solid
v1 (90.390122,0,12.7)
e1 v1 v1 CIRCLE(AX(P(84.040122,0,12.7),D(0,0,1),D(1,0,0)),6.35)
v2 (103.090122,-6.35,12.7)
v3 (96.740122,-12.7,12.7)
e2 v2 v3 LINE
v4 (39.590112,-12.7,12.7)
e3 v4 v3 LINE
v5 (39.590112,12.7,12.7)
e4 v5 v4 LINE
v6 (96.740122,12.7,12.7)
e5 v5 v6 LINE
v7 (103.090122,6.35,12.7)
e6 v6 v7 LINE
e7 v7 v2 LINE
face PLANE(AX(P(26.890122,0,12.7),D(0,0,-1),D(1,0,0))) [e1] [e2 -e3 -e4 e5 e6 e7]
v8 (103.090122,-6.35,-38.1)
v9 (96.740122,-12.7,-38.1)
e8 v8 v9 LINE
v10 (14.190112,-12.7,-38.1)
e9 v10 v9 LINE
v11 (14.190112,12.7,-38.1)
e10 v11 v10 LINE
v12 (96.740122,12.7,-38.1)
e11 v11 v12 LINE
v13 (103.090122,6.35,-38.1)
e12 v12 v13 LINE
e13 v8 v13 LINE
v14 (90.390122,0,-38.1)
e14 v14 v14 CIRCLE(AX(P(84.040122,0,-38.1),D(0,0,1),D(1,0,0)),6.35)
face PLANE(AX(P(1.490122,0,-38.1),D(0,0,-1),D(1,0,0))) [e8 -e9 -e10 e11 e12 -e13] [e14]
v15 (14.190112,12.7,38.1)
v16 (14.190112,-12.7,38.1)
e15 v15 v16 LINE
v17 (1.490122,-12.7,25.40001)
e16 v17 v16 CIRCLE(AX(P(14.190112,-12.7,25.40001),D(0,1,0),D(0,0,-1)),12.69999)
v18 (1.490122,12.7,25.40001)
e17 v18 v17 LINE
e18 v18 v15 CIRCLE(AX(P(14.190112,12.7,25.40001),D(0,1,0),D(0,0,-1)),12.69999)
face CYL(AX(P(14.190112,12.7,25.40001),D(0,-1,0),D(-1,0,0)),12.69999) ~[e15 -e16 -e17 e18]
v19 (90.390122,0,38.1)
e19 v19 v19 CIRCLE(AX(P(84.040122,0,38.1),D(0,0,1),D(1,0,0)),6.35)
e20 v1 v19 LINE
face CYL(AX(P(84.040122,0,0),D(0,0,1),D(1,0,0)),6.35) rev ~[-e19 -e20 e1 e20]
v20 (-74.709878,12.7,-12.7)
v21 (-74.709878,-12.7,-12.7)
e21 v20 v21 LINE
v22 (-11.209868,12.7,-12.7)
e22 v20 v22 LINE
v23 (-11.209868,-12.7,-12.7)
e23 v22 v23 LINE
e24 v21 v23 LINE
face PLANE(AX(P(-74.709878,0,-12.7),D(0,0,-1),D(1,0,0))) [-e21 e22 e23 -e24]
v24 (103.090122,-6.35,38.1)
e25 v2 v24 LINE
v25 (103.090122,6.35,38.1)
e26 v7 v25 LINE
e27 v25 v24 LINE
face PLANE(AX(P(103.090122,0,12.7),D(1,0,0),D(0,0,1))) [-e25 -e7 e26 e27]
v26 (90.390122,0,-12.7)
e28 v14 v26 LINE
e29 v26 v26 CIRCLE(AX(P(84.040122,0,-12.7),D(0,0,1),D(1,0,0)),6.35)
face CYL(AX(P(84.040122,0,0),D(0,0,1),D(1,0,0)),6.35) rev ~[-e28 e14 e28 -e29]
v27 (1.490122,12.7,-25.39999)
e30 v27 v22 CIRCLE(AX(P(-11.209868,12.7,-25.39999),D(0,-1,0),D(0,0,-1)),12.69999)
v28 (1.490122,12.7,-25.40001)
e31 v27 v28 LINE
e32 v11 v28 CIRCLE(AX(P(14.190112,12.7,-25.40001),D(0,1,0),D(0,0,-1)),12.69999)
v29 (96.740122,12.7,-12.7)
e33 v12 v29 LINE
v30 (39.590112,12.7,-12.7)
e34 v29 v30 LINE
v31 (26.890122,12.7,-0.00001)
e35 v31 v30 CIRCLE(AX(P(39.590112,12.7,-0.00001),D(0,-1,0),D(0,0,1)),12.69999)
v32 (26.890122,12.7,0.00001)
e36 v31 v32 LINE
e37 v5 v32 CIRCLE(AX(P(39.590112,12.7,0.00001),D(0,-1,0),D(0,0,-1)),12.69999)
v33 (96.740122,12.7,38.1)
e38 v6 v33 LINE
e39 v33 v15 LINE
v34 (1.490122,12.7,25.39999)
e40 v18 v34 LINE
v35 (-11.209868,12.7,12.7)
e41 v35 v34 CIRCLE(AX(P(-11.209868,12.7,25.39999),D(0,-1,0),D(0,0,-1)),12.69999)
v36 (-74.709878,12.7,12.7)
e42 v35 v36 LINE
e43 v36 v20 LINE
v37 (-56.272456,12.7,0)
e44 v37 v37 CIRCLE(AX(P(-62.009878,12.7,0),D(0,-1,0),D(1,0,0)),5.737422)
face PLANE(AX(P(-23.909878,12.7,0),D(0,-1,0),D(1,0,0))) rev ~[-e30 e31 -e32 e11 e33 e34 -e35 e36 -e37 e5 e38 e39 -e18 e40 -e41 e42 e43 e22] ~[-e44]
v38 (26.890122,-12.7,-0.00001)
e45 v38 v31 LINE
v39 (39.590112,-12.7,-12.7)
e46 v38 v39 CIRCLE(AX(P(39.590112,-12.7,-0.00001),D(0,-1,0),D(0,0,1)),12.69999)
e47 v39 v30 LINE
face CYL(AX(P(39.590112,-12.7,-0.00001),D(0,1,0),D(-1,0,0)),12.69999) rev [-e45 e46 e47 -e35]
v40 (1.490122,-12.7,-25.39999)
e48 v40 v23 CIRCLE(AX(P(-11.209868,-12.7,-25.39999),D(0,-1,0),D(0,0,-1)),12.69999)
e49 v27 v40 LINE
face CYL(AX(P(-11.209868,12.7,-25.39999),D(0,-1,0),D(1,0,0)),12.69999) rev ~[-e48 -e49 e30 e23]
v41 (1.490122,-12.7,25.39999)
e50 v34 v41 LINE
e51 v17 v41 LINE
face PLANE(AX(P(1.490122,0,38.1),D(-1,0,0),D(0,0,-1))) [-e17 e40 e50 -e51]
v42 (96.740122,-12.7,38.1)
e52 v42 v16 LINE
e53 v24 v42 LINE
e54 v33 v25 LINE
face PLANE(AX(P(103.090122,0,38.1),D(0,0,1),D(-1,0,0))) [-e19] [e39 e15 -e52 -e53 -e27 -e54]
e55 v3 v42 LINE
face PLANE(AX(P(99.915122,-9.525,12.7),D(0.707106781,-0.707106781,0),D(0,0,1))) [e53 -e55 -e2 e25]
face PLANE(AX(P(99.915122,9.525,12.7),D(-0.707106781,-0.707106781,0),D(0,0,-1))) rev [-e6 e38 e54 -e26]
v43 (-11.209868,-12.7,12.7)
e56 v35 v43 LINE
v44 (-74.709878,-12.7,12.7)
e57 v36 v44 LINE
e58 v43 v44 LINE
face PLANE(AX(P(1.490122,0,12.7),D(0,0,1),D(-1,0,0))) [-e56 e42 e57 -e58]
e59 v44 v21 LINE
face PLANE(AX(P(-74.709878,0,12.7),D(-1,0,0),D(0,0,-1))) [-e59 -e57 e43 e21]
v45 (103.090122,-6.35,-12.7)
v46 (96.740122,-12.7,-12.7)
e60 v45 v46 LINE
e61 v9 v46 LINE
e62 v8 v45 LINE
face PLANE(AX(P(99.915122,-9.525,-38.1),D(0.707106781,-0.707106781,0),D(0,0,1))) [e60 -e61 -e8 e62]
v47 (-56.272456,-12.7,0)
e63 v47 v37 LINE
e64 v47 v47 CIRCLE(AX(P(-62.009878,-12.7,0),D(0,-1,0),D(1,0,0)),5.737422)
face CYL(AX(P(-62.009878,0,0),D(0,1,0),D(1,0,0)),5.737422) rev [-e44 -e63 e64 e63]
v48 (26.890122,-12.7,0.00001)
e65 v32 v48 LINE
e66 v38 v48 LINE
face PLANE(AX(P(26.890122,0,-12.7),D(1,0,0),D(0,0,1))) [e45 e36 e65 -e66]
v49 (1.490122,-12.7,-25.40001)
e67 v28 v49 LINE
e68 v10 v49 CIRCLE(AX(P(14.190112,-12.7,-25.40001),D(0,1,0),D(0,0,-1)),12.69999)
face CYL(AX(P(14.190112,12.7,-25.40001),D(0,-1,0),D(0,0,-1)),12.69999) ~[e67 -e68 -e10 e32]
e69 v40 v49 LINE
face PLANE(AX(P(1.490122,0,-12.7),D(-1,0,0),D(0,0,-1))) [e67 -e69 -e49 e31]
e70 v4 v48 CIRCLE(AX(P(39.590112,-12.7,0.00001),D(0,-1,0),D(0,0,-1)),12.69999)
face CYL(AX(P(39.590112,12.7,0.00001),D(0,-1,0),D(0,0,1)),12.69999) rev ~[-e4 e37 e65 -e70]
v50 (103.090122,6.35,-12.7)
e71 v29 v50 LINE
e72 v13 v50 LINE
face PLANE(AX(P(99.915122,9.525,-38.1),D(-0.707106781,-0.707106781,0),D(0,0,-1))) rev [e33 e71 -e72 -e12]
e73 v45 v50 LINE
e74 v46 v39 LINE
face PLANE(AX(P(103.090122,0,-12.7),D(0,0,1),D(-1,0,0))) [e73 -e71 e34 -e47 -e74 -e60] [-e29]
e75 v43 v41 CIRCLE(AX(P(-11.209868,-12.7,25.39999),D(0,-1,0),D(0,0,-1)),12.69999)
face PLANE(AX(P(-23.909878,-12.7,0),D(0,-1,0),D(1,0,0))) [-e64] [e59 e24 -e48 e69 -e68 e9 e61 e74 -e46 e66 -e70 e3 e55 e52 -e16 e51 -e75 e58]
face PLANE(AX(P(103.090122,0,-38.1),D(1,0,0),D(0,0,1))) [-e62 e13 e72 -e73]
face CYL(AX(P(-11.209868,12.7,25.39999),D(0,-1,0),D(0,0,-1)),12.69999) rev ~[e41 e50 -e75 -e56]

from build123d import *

# Parameters (mm, degrees)
F0_R     = 5.7374218315
F1_DEPTH = 12.7
F2_R     = 12.69999
F3_R     = 12.69999
F4_R     = 12.69999
F5_SIZE2 = 6.35
F5_SIZE  = 6.35
F6_SIZE2 = 6.35
F6_SIZE  = 6.35
F7_R     = 6.35
F8_DEPTH = 127


# Not quite as in the source:
# - a fillet or chamfer is up to 0.001 mm smaller than in the source, because OpenCascade refuses the exact size


with BuildPart() as f1:
    # F0 (on Front) → F1 (new body, symmetric)
    with BuildSketch(Plane.XZ):
        Polygon((26.8901219662, -12.7), (26.8901219662, 12.7), (1.4901219662, 12.7), (-74.7098780338, 12.7), (-74.7098780338, -12.7), (1.4901219662, -12.7), align=None)
        with Locations((-62.0098780338, 0)):
            Circle(F0_R, mode=Mode.SUBTRACT)
        Polygon((1.4901219662, 12.7), (26.8901219662, 12.7), (103.0901219662, 12.7), (103.0901219662, 38.1), (1.4901219662, 38.1), align=None)
        Polygon((103.0901219662, -12.7), (26.8901219662, -12.7), (1.4901219662, -12.7), (1.4901219662, -38.1), (103.0901219662, -38.1), align=None)
    extrude(amount=F1_DEPTH, both=True)

    # F2 (radius 12.7 in the source; OpenCascade refuses exactly that, so slightly less here)
    f2_edges = [f1.edges().sort_by_distance(p)[0] for p in [
        (1.490122, 0, 38.1),
        (1.490122, 0, 12.7),
    ]]
    fillet(f2_edges, radius=F2_R)

    # F3 (radius 12.7 in the source; OpenCascade refuses exactly that, so slightly less here)
    f3_edges = [f1.edges().sort_by_distance(p)[0] for p in [
        (26.890122, 0, 12.7),
        (26.890122, 0, -12.7),
    ]]
    fillet(f3_edges, radius=F3_R)

    # F4 (radius 12.7 in the source; OpenCascade refuses exactly that, so slightly less here)
    f4_edges = [f1.edges().sort_by_distance(p)[0] for p in [
        (1.490122, 0, -12.7),
        (1.490122, 0, -38.1),
    ]]
    fillet(f4_edges, radius=F4_R)

    # F5
    f5_edges = [f1.edges().sort_by_distance(p)[0] for p in [
        (103.090122, -12.7, 25.4),
        (103.090122, 12.7, 25.4),
    ]]
    chamfer(f5_edges, length=F5_SIZE, length2=F5_SIZE2)

    # F6
    f6_edges = [f1.edges().sort_by_distance(p)[0] for p in [
        (103.090122, -12.7, -25.4),
        (103.090122, 12.7, -25.4),
    ]]
    chamfer(f6_edges, length=F6_SIZE, length2=F6_SIZE2)

    # F7 (on Top) → F8 (cut, symmetric)
    with BuildSketch(Plane.XY):
        with Locations((84.0401219662, 0)):
            Circle(F7_R)
    extrude(amount=F8_DEPTH, both=True, mode=Mode.SUBTRACT)


solid = f1.part
